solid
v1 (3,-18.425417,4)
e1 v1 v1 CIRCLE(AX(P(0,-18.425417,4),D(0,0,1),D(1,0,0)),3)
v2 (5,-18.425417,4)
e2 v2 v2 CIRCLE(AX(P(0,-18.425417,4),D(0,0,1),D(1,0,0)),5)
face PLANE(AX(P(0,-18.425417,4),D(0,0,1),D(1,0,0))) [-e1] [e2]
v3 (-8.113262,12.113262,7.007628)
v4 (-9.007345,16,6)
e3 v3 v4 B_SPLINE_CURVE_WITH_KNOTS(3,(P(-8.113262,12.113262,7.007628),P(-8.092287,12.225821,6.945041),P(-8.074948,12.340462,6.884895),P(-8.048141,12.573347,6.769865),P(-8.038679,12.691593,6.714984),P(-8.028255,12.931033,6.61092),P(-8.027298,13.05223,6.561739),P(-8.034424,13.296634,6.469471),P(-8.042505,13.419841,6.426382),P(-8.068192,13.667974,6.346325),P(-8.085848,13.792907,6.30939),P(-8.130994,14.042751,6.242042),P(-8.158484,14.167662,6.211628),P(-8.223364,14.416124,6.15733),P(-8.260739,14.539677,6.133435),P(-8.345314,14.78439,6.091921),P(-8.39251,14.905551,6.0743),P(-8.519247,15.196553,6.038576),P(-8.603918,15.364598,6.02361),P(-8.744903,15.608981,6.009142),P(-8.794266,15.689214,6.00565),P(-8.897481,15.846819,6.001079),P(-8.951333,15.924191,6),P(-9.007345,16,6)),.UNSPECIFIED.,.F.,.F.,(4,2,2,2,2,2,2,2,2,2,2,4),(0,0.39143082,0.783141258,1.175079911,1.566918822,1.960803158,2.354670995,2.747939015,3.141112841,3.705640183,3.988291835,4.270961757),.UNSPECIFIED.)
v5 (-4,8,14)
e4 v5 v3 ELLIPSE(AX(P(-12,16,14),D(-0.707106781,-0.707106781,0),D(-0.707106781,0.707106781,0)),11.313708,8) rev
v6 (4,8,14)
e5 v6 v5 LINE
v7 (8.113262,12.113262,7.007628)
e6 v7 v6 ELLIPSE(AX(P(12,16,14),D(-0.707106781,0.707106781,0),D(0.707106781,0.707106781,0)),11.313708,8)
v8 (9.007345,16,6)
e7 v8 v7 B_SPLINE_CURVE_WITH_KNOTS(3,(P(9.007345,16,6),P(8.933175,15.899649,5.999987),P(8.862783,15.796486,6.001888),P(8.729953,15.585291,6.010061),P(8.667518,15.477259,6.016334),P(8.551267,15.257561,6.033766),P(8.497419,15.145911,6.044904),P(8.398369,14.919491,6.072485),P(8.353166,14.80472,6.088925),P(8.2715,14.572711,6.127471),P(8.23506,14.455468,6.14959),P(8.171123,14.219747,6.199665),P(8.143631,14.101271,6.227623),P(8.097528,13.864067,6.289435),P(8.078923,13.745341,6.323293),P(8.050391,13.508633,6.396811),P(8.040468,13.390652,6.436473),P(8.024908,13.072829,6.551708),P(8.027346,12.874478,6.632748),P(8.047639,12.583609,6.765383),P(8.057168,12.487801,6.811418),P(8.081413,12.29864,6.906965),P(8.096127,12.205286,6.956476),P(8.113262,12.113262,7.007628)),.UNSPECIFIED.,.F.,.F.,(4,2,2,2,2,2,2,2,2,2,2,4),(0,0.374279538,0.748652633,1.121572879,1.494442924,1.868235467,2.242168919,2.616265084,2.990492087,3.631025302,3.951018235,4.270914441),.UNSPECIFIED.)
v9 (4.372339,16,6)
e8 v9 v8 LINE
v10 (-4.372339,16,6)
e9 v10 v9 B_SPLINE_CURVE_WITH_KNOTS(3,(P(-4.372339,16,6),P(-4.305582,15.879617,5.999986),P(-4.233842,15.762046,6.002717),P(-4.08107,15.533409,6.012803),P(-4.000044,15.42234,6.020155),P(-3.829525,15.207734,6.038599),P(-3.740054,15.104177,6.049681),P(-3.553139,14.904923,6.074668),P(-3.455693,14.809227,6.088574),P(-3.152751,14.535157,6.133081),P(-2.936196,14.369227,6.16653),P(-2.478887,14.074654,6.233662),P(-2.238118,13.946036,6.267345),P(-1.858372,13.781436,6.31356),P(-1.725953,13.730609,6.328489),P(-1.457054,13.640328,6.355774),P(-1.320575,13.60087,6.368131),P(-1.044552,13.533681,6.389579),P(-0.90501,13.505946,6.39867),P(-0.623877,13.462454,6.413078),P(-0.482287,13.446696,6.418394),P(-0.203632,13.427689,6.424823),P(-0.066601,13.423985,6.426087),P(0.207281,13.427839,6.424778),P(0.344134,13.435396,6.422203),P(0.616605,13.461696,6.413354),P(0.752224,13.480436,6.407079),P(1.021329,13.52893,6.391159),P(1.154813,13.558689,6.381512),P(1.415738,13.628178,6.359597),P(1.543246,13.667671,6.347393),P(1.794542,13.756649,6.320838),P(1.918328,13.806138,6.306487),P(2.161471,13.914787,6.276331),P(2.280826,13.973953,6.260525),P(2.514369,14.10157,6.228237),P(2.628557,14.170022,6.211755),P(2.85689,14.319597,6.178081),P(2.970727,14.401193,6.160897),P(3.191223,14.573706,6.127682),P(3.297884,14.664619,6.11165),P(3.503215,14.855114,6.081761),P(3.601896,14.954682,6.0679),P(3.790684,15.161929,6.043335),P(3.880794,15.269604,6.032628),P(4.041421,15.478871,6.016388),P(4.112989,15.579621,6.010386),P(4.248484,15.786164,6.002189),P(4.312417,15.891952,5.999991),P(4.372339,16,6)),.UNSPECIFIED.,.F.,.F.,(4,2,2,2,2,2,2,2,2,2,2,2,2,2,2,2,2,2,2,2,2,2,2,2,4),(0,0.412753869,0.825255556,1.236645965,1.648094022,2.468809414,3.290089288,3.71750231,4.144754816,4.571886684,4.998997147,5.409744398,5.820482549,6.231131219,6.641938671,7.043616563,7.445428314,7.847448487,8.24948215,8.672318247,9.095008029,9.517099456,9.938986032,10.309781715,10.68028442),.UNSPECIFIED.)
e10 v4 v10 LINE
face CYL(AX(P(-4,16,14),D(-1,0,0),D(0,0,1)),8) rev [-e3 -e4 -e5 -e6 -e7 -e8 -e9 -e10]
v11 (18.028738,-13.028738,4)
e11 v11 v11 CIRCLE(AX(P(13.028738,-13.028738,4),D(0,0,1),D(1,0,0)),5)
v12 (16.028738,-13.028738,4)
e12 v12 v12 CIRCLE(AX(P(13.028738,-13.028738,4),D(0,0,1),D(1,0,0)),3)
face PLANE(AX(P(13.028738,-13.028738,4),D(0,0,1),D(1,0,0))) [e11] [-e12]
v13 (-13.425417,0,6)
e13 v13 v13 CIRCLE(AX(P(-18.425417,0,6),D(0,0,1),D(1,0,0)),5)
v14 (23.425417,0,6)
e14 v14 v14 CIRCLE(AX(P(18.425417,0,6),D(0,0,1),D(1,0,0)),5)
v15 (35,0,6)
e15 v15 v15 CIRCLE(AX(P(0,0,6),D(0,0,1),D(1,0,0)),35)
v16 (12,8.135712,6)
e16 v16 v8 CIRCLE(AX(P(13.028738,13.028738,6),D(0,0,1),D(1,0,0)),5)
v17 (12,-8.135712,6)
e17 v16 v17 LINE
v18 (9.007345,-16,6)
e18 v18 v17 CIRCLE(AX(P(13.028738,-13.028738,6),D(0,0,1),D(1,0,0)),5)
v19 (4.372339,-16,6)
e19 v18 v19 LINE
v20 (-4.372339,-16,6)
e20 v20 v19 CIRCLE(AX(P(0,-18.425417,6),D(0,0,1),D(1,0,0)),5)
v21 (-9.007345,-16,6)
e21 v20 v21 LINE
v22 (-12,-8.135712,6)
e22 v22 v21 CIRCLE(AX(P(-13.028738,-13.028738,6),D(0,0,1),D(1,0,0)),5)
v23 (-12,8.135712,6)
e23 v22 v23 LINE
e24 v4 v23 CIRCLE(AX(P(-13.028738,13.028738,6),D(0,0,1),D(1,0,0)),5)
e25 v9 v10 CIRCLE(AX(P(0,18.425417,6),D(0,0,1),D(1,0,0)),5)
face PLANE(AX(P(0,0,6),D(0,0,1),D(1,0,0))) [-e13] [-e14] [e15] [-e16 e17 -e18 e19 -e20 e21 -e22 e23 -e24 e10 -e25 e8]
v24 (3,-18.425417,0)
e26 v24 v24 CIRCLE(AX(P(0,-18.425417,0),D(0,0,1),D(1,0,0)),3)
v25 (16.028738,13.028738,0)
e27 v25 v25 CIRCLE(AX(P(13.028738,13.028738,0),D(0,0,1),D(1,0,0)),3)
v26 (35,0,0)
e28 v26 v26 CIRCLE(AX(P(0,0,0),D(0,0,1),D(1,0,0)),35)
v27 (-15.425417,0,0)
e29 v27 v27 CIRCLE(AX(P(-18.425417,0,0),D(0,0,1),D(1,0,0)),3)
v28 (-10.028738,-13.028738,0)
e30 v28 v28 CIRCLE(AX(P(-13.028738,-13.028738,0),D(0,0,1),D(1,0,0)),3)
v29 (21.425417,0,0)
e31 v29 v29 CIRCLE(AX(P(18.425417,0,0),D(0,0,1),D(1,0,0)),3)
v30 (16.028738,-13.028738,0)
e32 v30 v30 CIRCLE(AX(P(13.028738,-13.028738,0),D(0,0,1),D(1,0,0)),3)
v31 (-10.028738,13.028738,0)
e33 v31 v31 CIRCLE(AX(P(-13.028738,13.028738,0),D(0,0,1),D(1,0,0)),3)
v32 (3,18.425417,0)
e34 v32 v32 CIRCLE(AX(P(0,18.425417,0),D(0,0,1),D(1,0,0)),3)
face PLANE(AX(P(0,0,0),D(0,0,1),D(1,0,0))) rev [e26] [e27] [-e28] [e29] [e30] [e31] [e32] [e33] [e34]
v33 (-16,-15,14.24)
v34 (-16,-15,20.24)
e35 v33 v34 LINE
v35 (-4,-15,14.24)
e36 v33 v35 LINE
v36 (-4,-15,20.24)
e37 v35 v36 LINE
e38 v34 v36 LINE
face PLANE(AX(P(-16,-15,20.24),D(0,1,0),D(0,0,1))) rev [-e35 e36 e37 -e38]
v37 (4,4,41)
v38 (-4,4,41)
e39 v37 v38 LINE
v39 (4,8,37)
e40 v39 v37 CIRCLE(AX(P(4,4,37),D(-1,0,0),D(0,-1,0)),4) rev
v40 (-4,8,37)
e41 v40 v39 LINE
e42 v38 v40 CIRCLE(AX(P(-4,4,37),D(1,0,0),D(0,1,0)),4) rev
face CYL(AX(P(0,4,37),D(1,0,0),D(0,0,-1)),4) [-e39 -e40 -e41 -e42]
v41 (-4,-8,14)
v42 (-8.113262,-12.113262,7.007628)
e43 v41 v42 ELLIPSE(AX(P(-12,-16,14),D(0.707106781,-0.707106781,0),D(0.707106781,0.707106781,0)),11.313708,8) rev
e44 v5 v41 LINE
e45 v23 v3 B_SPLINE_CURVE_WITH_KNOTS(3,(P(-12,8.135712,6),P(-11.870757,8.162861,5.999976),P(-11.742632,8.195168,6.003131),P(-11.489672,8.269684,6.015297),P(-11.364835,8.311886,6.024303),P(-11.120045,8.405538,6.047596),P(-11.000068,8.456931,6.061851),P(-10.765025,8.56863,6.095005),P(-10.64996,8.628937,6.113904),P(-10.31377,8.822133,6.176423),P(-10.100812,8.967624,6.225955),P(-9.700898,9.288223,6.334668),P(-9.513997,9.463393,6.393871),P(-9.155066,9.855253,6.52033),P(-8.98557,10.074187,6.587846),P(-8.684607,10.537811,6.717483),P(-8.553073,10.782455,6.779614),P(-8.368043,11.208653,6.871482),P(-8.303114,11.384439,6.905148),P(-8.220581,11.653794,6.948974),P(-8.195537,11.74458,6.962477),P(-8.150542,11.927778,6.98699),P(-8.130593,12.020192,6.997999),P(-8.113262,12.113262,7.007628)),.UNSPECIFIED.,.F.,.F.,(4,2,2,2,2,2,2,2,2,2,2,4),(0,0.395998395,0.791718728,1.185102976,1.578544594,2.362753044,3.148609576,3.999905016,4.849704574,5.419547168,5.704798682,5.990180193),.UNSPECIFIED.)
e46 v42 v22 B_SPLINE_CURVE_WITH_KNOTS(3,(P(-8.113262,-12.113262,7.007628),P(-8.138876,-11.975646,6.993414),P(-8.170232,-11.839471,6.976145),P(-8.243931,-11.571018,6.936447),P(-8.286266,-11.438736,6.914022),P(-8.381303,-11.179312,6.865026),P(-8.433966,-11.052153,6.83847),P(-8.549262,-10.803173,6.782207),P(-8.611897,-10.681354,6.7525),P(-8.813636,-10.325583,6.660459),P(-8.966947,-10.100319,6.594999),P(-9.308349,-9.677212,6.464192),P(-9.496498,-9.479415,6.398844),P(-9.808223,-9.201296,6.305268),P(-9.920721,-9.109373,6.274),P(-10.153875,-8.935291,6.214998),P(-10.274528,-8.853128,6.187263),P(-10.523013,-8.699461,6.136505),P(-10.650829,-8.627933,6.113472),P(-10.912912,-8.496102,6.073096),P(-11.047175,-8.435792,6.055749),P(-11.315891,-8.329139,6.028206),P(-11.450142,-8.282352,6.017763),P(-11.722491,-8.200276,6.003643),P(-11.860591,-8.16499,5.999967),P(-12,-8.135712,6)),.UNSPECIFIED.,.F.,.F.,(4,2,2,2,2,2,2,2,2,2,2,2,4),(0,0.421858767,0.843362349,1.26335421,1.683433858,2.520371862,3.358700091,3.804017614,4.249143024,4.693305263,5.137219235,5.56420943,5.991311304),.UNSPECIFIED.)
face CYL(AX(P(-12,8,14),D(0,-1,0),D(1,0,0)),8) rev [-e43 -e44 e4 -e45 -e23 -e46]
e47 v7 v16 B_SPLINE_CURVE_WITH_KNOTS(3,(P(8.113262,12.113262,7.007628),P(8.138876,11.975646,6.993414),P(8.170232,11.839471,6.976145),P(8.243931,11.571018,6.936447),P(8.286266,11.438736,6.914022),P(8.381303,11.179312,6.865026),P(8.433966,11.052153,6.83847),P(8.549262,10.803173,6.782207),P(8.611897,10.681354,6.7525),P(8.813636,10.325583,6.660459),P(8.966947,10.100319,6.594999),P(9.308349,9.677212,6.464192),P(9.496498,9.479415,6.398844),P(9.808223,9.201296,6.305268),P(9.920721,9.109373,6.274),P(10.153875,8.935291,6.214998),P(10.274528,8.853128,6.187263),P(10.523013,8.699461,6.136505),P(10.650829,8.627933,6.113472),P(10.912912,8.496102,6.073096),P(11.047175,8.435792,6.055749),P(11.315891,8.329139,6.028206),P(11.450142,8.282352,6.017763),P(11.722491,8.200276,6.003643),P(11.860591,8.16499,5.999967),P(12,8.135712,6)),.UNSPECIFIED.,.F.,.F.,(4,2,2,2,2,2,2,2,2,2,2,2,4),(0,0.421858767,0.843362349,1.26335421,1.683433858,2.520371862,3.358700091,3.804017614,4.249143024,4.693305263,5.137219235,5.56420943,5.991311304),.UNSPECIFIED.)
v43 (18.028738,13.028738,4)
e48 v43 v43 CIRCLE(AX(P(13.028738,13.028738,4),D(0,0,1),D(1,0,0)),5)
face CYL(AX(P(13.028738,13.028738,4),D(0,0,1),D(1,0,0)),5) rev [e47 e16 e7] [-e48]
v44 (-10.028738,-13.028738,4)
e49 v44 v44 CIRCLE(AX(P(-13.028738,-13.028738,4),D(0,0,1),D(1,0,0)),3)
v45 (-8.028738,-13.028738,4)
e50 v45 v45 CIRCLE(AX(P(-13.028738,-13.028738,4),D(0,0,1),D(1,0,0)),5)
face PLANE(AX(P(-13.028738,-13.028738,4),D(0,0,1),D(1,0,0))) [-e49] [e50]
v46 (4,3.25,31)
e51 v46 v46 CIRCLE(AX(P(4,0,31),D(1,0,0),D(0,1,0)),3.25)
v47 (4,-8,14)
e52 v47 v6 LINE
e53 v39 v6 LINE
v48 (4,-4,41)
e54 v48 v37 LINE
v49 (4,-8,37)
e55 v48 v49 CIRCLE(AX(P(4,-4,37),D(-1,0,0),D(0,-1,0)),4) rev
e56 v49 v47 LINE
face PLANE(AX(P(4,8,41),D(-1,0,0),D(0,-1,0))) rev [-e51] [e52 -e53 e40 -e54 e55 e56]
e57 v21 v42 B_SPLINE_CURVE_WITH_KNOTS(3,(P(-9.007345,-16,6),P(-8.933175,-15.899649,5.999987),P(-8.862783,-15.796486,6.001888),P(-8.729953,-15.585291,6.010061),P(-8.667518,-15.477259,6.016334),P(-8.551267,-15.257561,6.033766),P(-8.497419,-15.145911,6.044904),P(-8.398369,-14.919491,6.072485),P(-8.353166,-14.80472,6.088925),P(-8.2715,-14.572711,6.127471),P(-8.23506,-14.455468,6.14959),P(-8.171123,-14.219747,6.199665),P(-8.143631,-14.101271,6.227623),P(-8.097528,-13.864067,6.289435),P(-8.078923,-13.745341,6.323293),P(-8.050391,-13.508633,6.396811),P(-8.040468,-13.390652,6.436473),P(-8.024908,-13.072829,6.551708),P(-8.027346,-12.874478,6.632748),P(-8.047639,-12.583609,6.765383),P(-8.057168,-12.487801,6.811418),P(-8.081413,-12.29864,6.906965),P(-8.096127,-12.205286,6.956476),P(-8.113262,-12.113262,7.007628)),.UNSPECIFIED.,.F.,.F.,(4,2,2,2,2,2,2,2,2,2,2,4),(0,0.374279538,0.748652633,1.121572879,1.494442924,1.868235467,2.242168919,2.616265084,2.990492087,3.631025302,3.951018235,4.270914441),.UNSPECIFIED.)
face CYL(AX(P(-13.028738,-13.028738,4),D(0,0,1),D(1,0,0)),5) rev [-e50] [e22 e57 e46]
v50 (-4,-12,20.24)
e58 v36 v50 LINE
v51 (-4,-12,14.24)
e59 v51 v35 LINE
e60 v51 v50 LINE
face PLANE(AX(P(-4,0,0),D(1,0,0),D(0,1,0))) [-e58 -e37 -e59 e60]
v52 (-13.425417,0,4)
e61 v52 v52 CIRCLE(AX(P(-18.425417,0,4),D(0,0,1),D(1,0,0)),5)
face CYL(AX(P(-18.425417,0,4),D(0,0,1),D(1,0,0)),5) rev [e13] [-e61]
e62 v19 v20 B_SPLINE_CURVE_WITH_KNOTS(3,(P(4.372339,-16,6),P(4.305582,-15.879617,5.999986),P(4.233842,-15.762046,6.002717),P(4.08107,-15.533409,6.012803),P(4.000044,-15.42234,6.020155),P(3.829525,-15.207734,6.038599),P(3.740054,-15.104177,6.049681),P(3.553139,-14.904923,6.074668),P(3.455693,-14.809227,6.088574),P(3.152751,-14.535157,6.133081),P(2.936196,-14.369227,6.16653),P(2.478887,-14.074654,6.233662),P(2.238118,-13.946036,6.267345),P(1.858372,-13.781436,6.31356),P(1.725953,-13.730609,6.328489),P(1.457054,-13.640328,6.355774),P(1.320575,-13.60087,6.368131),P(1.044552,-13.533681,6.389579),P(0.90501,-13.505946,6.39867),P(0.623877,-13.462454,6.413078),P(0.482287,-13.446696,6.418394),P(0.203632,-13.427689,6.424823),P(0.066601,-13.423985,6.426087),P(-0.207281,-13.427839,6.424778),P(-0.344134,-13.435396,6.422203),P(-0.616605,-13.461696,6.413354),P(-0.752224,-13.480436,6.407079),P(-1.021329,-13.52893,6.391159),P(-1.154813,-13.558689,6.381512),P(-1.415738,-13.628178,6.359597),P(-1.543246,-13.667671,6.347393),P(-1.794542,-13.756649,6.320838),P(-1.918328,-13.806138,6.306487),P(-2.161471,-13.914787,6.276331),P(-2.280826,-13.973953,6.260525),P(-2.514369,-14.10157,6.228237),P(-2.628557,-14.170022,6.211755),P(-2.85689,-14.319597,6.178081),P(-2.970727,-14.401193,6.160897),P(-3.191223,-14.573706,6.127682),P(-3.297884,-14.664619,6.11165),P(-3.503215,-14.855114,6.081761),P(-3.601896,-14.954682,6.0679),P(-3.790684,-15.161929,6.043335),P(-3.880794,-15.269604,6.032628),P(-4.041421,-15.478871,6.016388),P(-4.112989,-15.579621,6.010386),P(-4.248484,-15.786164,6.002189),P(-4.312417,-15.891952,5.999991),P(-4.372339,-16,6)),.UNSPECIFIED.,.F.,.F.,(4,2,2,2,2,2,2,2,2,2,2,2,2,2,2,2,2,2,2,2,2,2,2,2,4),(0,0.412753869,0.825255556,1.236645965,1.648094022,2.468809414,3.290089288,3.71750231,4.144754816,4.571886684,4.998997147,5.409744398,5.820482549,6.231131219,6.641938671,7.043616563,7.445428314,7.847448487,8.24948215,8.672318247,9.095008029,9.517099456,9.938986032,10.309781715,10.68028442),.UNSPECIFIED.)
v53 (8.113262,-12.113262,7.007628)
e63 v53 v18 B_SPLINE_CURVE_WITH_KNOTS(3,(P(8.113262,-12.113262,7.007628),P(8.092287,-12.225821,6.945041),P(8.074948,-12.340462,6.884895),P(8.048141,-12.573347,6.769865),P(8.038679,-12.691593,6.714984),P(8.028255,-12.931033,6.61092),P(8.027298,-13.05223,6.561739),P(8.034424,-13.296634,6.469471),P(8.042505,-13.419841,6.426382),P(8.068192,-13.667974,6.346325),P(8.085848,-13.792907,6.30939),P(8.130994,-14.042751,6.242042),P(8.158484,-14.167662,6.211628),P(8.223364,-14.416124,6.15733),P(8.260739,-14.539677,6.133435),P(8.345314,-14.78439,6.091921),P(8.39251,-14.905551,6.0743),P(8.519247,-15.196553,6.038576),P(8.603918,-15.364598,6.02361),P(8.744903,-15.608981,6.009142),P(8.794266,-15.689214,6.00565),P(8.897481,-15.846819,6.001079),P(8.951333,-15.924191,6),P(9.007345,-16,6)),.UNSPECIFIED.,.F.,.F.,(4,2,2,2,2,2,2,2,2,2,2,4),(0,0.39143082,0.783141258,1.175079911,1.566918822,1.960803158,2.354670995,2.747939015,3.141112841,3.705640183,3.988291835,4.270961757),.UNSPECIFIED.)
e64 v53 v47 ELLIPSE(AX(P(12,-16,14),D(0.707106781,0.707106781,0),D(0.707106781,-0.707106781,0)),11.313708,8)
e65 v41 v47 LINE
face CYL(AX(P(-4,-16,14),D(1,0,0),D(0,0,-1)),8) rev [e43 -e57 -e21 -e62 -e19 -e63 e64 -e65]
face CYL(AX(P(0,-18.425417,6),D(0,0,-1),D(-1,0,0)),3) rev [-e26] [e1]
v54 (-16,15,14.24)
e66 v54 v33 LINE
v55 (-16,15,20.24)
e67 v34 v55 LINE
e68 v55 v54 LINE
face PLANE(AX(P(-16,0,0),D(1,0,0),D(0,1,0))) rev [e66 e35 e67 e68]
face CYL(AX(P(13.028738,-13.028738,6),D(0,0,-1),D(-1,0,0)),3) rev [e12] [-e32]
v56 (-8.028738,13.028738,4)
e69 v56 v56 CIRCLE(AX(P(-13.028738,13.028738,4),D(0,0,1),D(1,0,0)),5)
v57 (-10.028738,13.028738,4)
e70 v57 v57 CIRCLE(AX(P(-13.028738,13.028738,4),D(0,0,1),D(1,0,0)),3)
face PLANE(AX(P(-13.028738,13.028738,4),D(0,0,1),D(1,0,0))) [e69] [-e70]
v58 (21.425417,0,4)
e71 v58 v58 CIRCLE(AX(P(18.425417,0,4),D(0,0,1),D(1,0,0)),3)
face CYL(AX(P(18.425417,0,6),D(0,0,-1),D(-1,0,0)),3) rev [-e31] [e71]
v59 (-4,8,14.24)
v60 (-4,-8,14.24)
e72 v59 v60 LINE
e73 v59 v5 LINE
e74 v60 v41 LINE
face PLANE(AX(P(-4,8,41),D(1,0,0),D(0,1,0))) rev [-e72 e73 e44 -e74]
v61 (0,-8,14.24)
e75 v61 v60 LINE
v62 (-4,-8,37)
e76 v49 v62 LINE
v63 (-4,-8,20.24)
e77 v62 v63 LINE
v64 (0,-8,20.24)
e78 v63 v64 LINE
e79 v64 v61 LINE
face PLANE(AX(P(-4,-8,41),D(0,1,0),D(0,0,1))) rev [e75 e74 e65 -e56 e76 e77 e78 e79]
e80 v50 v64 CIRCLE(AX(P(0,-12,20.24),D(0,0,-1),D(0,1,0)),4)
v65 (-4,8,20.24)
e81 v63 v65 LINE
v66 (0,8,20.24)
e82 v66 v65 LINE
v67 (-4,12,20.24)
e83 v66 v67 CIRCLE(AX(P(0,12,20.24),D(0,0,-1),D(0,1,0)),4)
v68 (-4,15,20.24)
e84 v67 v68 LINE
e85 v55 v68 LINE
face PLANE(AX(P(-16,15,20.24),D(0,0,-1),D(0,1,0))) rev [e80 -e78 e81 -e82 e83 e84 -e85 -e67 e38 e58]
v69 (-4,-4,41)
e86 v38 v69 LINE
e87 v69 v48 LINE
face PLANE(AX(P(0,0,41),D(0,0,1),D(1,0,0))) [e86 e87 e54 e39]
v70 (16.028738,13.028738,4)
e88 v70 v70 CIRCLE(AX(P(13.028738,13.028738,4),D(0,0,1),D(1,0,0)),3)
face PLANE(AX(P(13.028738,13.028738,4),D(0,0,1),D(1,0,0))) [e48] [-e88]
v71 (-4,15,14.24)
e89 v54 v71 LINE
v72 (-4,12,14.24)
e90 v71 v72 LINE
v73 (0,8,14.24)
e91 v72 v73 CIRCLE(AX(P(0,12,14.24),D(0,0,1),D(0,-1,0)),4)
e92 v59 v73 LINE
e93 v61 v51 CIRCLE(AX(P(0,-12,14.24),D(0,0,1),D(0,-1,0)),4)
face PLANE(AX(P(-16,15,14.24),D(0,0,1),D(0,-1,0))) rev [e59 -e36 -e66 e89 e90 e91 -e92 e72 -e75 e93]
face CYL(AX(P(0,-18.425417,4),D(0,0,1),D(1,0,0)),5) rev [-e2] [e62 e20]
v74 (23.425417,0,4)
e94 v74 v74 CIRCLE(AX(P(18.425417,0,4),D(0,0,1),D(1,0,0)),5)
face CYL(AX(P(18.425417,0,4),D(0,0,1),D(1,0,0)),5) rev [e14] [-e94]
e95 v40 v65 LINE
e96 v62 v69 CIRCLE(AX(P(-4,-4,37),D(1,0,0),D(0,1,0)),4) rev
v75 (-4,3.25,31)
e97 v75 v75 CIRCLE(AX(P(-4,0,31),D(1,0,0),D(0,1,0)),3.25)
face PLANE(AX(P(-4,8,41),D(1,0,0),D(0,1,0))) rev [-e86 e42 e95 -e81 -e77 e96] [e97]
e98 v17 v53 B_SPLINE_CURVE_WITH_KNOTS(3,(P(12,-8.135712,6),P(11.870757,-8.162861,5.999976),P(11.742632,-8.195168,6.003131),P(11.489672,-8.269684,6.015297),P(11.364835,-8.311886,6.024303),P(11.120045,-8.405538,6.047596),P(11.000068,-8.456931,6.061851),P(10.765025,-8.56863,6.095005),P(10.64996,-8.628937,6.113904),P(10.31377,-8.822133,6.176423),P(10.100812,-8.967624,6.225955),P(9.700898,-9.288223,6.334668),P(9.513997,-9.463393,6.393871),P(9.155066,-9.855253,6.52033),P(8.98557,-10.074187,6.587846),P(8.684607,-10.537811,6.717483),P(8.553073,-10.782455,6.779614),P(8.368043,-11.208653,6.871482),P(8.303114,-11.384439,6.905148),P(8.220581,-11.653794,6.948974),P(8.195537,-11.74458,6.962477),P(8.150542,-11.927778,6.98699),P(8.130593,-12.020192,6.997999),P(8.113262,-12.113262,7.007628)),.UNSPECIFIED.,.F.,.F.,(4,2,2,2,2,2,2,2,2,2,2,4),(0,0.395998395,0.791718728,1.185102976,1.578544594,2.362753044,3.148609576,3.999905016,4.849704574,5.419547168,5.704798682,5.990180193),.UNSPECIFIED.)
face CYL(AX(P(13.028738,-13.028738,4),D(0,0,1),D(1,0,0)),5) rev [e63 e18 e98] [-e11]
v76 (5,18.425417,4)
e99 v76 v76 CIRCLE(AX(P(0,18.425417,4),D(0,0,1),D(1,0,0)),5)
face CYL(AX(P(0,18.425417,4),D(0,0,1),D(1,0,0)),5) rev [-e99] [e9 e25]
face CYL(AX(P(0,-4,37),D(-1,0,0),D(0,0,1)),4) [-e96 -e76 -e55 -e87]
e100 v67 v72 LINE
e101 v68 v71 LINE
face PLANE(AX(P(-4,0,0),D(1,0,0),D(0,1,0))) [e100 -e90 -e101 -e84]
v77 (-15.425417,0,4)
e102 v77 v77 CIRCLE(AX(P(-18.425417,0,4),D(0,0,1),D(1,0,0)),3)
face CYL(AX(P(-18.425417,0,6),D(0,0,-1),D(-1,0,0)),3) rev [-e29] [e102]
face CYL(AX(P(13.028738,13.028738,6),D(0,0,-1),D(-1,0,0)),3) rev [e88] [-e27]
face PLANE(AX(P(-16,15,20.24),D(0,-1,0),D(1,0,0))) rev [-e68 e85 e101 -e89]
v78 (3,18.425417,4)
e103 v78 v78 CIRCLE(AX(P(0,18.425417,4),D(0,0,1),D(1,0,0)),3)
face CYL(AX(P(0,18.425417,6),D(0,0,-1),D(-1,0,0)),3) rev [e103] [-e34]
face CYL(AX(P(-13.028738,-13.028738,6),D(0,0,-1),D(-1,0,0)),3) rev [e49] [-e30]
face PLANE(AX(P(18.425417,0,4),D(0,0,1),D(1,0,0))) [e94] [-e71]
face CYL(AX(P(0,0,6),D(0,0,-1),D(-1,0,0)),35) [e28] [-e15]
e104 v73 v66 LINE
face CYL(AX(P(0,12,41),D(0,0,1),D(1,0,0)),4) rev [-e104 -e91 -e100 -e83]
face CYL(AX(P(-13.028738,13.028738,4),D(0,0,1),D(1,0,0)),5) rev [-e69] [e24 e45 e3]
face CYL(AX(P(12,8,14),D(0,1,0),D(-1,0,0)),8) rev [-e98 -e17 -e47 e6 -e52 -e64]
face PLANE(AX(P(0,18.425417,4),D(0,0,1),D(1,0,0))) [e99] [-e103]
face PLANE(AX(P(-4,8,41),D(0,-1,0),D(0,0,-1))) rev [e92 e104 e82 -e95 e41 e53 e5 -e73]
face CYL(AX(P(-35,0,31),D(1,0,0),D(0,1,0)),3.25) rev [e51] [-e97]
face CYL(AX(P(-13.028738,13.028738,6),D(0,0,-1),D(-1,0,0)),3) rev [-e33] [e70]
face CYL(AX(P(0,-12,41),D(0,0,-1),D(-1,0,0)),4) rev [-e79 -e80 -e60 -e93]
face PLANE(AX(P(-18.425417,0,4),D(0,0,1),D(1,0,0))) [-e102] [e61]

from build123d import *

# Parameters (mm, degrees)
SKETCH1_R           = 35
SKETCH1_R_2         = 3
BOSS_EXTRUDE1_DEPTH = 6
SKETCH4_R           = 5
CUT_EXTRUDE1_DEPTH  = 2
SKETCH5_W           = 8
SKETCH5_H           = 16
BOSS_EXTRUDE2_DEPTH = 35
SKETCH6_R           = 3.25
CUT_EXTRUDE2_DEPTH  = 67.535704701
FILLET1_R           = 8
FILLET2_R           = 4
SKETCH7_W           = 6
SKETCH7_H           = 30
BOSS_EXTRUDE3_DEPTH = 12
FILLET3_R           = 4


with BuildPart() as part:
    # Sketch1 → Boss-Extrude1 (new body)
    with BuildSketch(Plane.XY):
        Circle(SKETCH1_R)
        with Locations((0, 18.425417274)):
            Circle(SKETCH1_R_2, mode=Mode.SUBTRACT)
        with Locations((13.028737501, 13.028737501)):
            Circle(SKETCH1_R_2, mode=Mode.SUBTRACT)
        with Locations((18.425417274, 0)):
            Circle(SKETCH1_R_2, mode=Mode.SUBTRACT)
        with Locations((13.028737501, -13.028737501)):
            Circle(SKETCH1_R_2, mode=Mode.SUBTRACT)
        with Locations((0, -18.425417274)):
            Circle(SKETCH1_R_2, mode=Mode.SUBTRACT)
        with Locations((-13.028737501, -13.028737501)):
            Circle(SKETCH1_R_2, mode=Mode.SUBTRACT)
        with Locations((-18.425417274, 0)):
            Circle(SKETCH1_R_2, mode=Mode.SUBTRACT)
        with Locations((-13.028737501, 13.028737501)):
            Circle(SKETCH1_R_2, mode=Mode.SUBTRACT)
    extrude(amount=BOSS_EXTRUDE1_DEPTH)

    # Sketch4 → Cut-Extrude1 (cut)
    with BuildSketch(Plane.XY.offset(6)):
        with Locations((0, 18.425417274)):
            Circle(SKETCH4_R)
        with Locations((13.028737501, 13.028737501)):
            Circle(SKETCH4_R)
        with Locations((18.425417274, 0)):
            Circle(SKETCH4_R)
        with Locations((13.028737501, -13.028737501)):
            Circle(SKETCH4_R)
        with Locations((0, -18.425417274)):
            Circle(SKETCH4_R)
        with Locations((-13.028737501, -13.028737501)):
            Circle(SKETCH4_R)
        with Locations((-18.425417274, 0)):
            Circle(SKETCH4_R)
        with Locations((-13.028737501, 13.028737501)):
            Circle(SKETCH4_R)
    extrude(amount=-CUT_EXTRUDE1_DEPTH, mode=Mode.SUBTRACT)

    # Sketch5 → Boss-Extrude2 (add)
    with BuildSketch(Plane.XY.offset(6)):
        Rectangle(SKETCH5_W, SKETCH5_H)
    extrude(amount=BOSS_EXTRUDE2_DEPTH)

    # Sketch6 → Cut-Extrude2 (cut, through all)
    with BuildSketch(Plane(origin=(4, 0, 0), x_dir=(0, 0, -1), z_dir=(1, 0, 0))):
        with Locations(Location((-31, 0, 0), (0, 0, 90))):
            Circle(SKETCH6_R)
    extrude(amount=-CUT_EXTRUDE2_DEPTH, mode=Mode.SUBTRACT)

    # Fillet1
    # the kernel refuses this fillet: 8 mm, written as the material it adds along each edge
    with BuildSketch(Plane(origin=(4, 8, 6), x_dir=(1, 0, 0), z_dir=(0, -1, 0)), Plane(origin=(-4, -8, 6), x_dir=(-1, 0, 0), z_dir=(0, 1, 0))) as fillet1_piece_1:
        with BuildLine():
            CenterArc((FILLET1_R, FILLET1_R), FILLET1_R, 180, 90)
            Line((0, FILLET1_R), (0, 0))
            Line((0, 0), (FILLET1_R, 0))
        make_face()
    extrude(amount=16)
    with BuildSketch(Plane(origin=(-4, 8, 6), x_dir=(0, 1, 0), z_dir=(1, 0, 0))) as fillet1_piece_2_section:
        with BuildLine():
            CenterArc((FILLET1_R, FILLET1_R), FILLET1_R, 180, 90)
            Line((0, FILLET1_R), (0, 0))
            Line((0, 0), (FILLET1_R, 0))
        make_face()
    fillet1_piece_2 = extrude(amount=8, mode=Mode.PRIVATE)
    fillet1_piece_2 = fillet1_piece_2 - Plane(origin=(0, 18.425417274, 7.870474633), x_dir=(1, 0, 0), z_dir=(0, 0, 1)) * Cylinder(5, 48, mode=Mode.PRIVATE)
    add(fillet1_piece_2)
    with BuildSketch(Plane(origin=(4, -8, 6), x_dir=(0, -1, 0), z_dir=(-1, 0, 0))) as fillet1_piece_3_section:
        with BuildLine():
            CenterArc((FILLET1_R, FILLET1_R), FILLET1_R, 180, 90)
            Line((0, FILLET1_R), (0, 0))
            Line((0, 0), (FILLET1_R, 0))
        make_face()
    fillet1_piece_3 = extrude(amount=8, mode=Mode.PRIVATE)
    fillet1_piece_3 = fillet1_piece_3 - Plane(origin=(0, -18.425417274, 7.870474633), x_dir=(1, 0, 0), z_dir=(0, 0, 1)) * Cylinder(5, 48, mode=Mode.PRIVATE)
    add(fillet1_piece_3)
    with BuildSketch(Plane(origin=(4, 28, 6), x_dir=(1, 0, 0), z_dir=(0, -1, 0))) as fillet1_piece_4a_section:
        with BuildLine():
            CenterArc((FILLET1_R, FILLET1_R), FILLET1_R, 180, 90)
            Line((0, FILLET1_R), (0, 0))
            Line((0, 0), (FILLET1_R, 0))
        make_face()
    fillet1_piece_4a = extrude(amount=36, mode=Mode.PRIVATE)
    fillet1_piece_4a = fillet1_piece_4a - Plane(origin=(0, 18.425417274, 7.7362908), x_dir=(1, 0, 0), z_dir=(0, 0, 1)) * Cylinder(5, 104, mode=Mode.PRIVATE)
    fillet1_piece_4a = fillet1_piece_4a - Plane(origin=(13.028737501, 13.028737501, 7.7362908), x_dir=(1, 0, 0), z_dir=(0, 0, 1)) * Cylinder(5, 104, mode=Mode.PRIVATE)
    fillet1_piece_4a = split(fillet1_piece_4a, bisect_by=Plane(origin=(5.823576256, 8, 7.7362908), z_dir=(0, 1, 0)), keep=Keep.TOP, mode=Mode.PRIVATE)
    with BuildSketch(Plane(origin=(-4, 8, 6), x_dir=(0, 1, 0), z_dir=(1, 0, 0))) as fillet1_piece_4b_section:
        with BuildLine():
            CenterArc((FILLET1_R, FILLET1_R), FILLET1_R, 180, 90)
            Line((0, FILLET1_R), (0, 0))
            Line((0, 0), (FILLET1_R, 0))
        make_face()
    fillet1_piece_4b = extrude(amount=28, mode=Mode.PRIVATE)
    fillet1_piece_4b = fillet1_piece_4b - Plane(origin=(0, 18.425417274, 6.213712954), x_dir=(1, 0, 0), z_dir=(0, 0, 1)) * Cylinder(5, 88, mode=Mode.PRIVATE)
    fillet1_piece_4b = fillet1_piece_4b - Plane(origin=(13.028737501, 13.028737501, 6.213712954), x_dir=(1, 0, 0), z_dir=(0, 0, 1)) * Cylinder(5, 88, mode=Mode.PRIVATE)
    fillet1_piece_4b = split(fillet1_piece_4b, bisect_by=Plane(origin=(4, 13.913670674, 6.213712954), z_dir=(1, 0, 0)), keep=Keep.TOP, mode=Mode.PRIVATE)
    fillet1_piece_4 = fillet1_piece_4a & fillet1_piece_4b
    add(fillet1_piece_4)
    with BuildSketch(Plane(origin=(24, -8, 6), x_dir=(0, -1, 0), z_dir=(-1, 0, 0))) as fillet1_piece_5a_section:
        with BuildLine():
            CenterArc((FILLET1_R, FILLET1_R), FILLET1_R, 180, 90)
            Line((0, FILLET1_R), (0, 0))
            Line((0, 0), (FILLET1_R, 0))
        make_face()
    fillet1_piece_5a = extrude(amount=28, mode=Mode.PRIVATE)
    fillet1_piece_5a = fillet1_piece_5a - Plane(origin=(0, -18.425417274, 6.213686684), x_dir=(1, 0, 0), z_dir=(0, 0, 1)) * Cylinder(5, 88, mode=Mode.PRIVATE)
    fillet1_piece_5a = fillet1_piece_5a - Plane(origin=(13.028737501, -13.028737501, 6.213686684), x_dir=(1, 0, 0), z_dir=(0, 0, 1)) * Cylinder(5, 88, mode=Mode.PRIVATE)
    fillet1_piece_5a = split(fillet1_piece_5a, bisect_by=Plane(origin=(4, -13.913663635, 6.213686684), z_dir=(1, 0, 0)), keep=Keep.TOP, mode=Mode.PRIVATE)
    with BuildSketch(Plane(origin=(4, 8, 6), x_dir=(1, 0, 0), z_dir=(0, -1, 0))) as fillet1_piece_5b_section:
        with BuildLine():
            CenterArc((FILLET1_R, FILLET1_R), FILLET1_R, 180, 90)
            Line((0, FILLET1_R), (0, 0))
            Line((0, 0), (FILLET1_R, 0))
        make_face()
    fillet1_piece_5b = extrude(amount=36, mode=Mode.PRIVATE)
    fillet1_piece_5b = fillet1_piece_5b - Plane(origin=(0, -18.425417274, 7.736290735), x_dir=(1, 0, 0), z_dir=(0, 0, 1)) * Cylinder(5, 104, mode=Mode.PRIVATE)
    fillet1_piece_5b = fillet1_piece_5b - Plane(origin=(13.028737501, -13.028737501, 7.736290735), x_dir=(1, 0, 0), z_dir=(0, 0, 1)) * Cylinder(5, 104, mode=Mode.PRIVATE)
    fillet1_piece_5b = split(fillet1_piece_5b, bisect_by=Plane(origin=(5.823577009, -8, 7.736290735), z_dir=(0, -1, 0)), keep=Keep.TOP, mode=Mode.PRIVATE)
    fillet1_piece_5 = fillet1_piece_5a & fillet1_piece_5b
    add(fillet1_piece_5)
    with BuildSketch(Plane(origin=(-4, -8, 6), x_dir=(-1, 0, 0), z_dir=(0, 1, 0))) as fillet1_piece_6a_section:
        with BuildLine():
            CenterArc((FILLET1_R, FILLET1_R), FILLET1_R, 180, 90)
            Line((0, FILLET1_R), (0, 0))
            Line((0, 0), (FILLET1_R, 0))
        make_face()
    fillet1_piece_6a = extrude(amount=36, mode=Mode.PRIVATE)
    fillet1_piece_6a = fillet1_piece_6a - Plane(origin=(-13.028737501, 13.028737501, 7.736291892), x_dir=(1, 0, 0), z_dir=(0, 0, 1)) * Cylinder(5, 104, mode=Mode.PRIVATE)
    fillet1_piece_6a = fillet1_piece_6a - Plane(origin=(0, 18.425417274, 7.736291892), x_dir=(1, 0, 0), z_dir=(0, 0, 1)) * Cylinder(5, 104, mode=Mode.PRIVATE)
    fillet1_piece_6a = split(fillet1_piece_6a, bisect_by=Plane(origin=(-5.823575173, 8, 7.736291892), z_dir=(0, 1, 0)), keep=Keep.TOP, mode=Mode.PRIVATE)
    with BuildSketch(Plane(origin=(-24, 8, 6), x_dir=(0, 1, 0), z_dir=(1, 0, 0))) as fillet1_piece_6b_section:
        with BuildLine():
            CenterArc((FILLET1_R, FILLET1_R), FILLET1_R, 180, 90)
            Line((0, FILLET1_R), (0, 0))
            Line((0, 0), (FILLET1_R, 0))
        make_face()
    fillet1_piece_6b = extrude(amount=28, mode=Mode.PRIVATE)
    fillet1_piece_6b = fillet1_piece_6b - Plane(origin=(-13.028737501, 13.028737501, 6.213714747), x_dir=(1, 0, 0), z_dir=(0, 0, 1)) * Cylinder(5, 88, mode=Mode.PRIVATE)
    fillet1_piece_6b = fillet1_piece_6b - Plane(origin=(0, 18.425417274, 6.213714747), x_dir=(1, 0, 0), z_dir=(0, 0, 1)) * Cylinder(5, 88, mode=Mode.PRIVATE)
    fillet1_piece_6b = split(fillet1_piece_6b, bisect_by=Plane(origin=(-4, 13.913671155, 6.213714747), z_dir=(-1, 0, 0)), keep=Keep.TOP, mode=Mode.PRIVATE)
    fillet1_piece_6 = fillet1_piece_6a & fillet1_piece_6b
    add(fillet1_piece_6)
    with BuildSketch(Plane(origin=(-4, -28, 6), x_dir=(-1, 0, 0), z_dir=(0, 1, 0))) as fillet1_piece_7a_section:
        with BuildLine():
            CenterArc((FILLET1_R, FILLET1_R), FILLET1_R, 180, 90)
            Line((0, FILLET1_R), (0, 0))
            Line((0, 0), (FILLET1_R, 0))
        make_face()
    fillet1_piece_7a = extrude(amount=36, mode=Mode.PRIVATE)
    fillet1_piece_7a = fillet1_piece_7a - Plane(origin=(-13.028737501, -13.028737501, 7.736291939), x_dir=(1, 0, 0), z_dir=(0, 0, 1)) * Cylinder(5, 104, mode=Mode.PRIVATE)
    fillet1_piece_7a = fillet1_piece_7a - Plane(origin=(0, -18.425417274, 7.736291939), x_dir=(1, 0, 0), z_dir=(0, 0, 1)) * Cylinder(5, 104, mode=Mode.PRIVATE)
    fillet1_piece_7a = split(fillet1_piece_7a, bisect_by=Plane(origin=(-5.823575033, -8, 7.736291939), z_dir=(0, -1, 0)), keep=Keep.TOP, mode=Mode.PRIVATE)
    with BuildSketch(Plane(origin=(4, -8, 6), x_dir=(0, -1, 0), z_dir=(-1, 0, 0))) as fillet1_piece_7b_section:
        with BuildLine():
            CenterArc((FILLET1_R, FILLET1_R), FILLET1_R, 180, 90)
            Line((0, FILLET1_R), (0, 0))
            Line((0, 0), (FILLET1_R, 0))
        make_face()
    fillet1_piece_7b = extrude(amount=28, mode=Mode.PRIVATE)
    fillet1_piece_7b = fillet1_piece_7b - Plane(origin=(-13.028737501, -13.028737501, 6.213687212), x_dir=(1, 0, 0), z_dir=(0, 0, 1)) * Cylinder(5, 88, mode=Mode.PRIVATE)
    fillet1_piece_7b = fillet1_piece_7b - Plane(origin=(0, -18.425417274, 6.213687212), x_dir=(1, 0, 0), z_dir=(0, 0, 1)) * Cylinder(5, 88, mode=Mode.PRIVATE)
    fillet1_piece_7b = split(fillet1_piece_7b, bisect_by=Plane(origin=(-4, -13.913663776, 6.213687212), z_dir=(-1, 0, 0)), keep=Keep.TOP, mode=Mode.PRIVATE)
    fillet1_piece_7 = fillet1_piece_7a & fillet1_piece_7b
    add(fillet1_piece_7)

    # Fillet2
    fillet2_edges = [part.edges().sort_by_distance(p)[0] for p in [
        (0, 8, 41),
        (0, -8, 41),
    ]]
    fillet(fillet2_edges, radius=FILLET2_R)

    # Sketch7 → Boss-Extrude3 (add)
    with BuildSketch(Plane.ZY.offset(4)):
        with Locations((17.24, 0)):
            Rectangle(SKETCH7_W, SKETCH7_H)
    extrude(amount=BOSS_EXTRUDE3_DEPTH)

    # Fillet3
    # the kernel refuses this fillet: 4 mm, written as the material it adds along each edge
    with BuildSketch(Plane(origin=(-4, -8, 14.24), x_dir=(1, 0, 0), z_dir=(0, 0, 1))) as fillet3_piece_1:
        with BuildLine():
            CenterArc((FILLET3_R, -FILLET3_R), FILLET3_R, 90, 90)
            Line((0, -FILLET3_R), (0, 0))
            Line((0, 0), (FILLET3_R, 0))
        make_face()
    extrude(amount=6)
    with BuildSketch(Plane(origin=(-4, 8, 14.24), x_dir=(1, 0, 0), z_dir=(0, 0, 1))) as fillet3_piece_2:
        with BuildLine():
            CenterArc((FILLET3_R, FILLET3_R), FILLET3_R, 180, 90)
            Line((0, FILLET3_R), (0, 0))
            Line((0, 0), (FILLET3_R, 0))
        make_face()
    extrude(amount=6)


solid = part.part
